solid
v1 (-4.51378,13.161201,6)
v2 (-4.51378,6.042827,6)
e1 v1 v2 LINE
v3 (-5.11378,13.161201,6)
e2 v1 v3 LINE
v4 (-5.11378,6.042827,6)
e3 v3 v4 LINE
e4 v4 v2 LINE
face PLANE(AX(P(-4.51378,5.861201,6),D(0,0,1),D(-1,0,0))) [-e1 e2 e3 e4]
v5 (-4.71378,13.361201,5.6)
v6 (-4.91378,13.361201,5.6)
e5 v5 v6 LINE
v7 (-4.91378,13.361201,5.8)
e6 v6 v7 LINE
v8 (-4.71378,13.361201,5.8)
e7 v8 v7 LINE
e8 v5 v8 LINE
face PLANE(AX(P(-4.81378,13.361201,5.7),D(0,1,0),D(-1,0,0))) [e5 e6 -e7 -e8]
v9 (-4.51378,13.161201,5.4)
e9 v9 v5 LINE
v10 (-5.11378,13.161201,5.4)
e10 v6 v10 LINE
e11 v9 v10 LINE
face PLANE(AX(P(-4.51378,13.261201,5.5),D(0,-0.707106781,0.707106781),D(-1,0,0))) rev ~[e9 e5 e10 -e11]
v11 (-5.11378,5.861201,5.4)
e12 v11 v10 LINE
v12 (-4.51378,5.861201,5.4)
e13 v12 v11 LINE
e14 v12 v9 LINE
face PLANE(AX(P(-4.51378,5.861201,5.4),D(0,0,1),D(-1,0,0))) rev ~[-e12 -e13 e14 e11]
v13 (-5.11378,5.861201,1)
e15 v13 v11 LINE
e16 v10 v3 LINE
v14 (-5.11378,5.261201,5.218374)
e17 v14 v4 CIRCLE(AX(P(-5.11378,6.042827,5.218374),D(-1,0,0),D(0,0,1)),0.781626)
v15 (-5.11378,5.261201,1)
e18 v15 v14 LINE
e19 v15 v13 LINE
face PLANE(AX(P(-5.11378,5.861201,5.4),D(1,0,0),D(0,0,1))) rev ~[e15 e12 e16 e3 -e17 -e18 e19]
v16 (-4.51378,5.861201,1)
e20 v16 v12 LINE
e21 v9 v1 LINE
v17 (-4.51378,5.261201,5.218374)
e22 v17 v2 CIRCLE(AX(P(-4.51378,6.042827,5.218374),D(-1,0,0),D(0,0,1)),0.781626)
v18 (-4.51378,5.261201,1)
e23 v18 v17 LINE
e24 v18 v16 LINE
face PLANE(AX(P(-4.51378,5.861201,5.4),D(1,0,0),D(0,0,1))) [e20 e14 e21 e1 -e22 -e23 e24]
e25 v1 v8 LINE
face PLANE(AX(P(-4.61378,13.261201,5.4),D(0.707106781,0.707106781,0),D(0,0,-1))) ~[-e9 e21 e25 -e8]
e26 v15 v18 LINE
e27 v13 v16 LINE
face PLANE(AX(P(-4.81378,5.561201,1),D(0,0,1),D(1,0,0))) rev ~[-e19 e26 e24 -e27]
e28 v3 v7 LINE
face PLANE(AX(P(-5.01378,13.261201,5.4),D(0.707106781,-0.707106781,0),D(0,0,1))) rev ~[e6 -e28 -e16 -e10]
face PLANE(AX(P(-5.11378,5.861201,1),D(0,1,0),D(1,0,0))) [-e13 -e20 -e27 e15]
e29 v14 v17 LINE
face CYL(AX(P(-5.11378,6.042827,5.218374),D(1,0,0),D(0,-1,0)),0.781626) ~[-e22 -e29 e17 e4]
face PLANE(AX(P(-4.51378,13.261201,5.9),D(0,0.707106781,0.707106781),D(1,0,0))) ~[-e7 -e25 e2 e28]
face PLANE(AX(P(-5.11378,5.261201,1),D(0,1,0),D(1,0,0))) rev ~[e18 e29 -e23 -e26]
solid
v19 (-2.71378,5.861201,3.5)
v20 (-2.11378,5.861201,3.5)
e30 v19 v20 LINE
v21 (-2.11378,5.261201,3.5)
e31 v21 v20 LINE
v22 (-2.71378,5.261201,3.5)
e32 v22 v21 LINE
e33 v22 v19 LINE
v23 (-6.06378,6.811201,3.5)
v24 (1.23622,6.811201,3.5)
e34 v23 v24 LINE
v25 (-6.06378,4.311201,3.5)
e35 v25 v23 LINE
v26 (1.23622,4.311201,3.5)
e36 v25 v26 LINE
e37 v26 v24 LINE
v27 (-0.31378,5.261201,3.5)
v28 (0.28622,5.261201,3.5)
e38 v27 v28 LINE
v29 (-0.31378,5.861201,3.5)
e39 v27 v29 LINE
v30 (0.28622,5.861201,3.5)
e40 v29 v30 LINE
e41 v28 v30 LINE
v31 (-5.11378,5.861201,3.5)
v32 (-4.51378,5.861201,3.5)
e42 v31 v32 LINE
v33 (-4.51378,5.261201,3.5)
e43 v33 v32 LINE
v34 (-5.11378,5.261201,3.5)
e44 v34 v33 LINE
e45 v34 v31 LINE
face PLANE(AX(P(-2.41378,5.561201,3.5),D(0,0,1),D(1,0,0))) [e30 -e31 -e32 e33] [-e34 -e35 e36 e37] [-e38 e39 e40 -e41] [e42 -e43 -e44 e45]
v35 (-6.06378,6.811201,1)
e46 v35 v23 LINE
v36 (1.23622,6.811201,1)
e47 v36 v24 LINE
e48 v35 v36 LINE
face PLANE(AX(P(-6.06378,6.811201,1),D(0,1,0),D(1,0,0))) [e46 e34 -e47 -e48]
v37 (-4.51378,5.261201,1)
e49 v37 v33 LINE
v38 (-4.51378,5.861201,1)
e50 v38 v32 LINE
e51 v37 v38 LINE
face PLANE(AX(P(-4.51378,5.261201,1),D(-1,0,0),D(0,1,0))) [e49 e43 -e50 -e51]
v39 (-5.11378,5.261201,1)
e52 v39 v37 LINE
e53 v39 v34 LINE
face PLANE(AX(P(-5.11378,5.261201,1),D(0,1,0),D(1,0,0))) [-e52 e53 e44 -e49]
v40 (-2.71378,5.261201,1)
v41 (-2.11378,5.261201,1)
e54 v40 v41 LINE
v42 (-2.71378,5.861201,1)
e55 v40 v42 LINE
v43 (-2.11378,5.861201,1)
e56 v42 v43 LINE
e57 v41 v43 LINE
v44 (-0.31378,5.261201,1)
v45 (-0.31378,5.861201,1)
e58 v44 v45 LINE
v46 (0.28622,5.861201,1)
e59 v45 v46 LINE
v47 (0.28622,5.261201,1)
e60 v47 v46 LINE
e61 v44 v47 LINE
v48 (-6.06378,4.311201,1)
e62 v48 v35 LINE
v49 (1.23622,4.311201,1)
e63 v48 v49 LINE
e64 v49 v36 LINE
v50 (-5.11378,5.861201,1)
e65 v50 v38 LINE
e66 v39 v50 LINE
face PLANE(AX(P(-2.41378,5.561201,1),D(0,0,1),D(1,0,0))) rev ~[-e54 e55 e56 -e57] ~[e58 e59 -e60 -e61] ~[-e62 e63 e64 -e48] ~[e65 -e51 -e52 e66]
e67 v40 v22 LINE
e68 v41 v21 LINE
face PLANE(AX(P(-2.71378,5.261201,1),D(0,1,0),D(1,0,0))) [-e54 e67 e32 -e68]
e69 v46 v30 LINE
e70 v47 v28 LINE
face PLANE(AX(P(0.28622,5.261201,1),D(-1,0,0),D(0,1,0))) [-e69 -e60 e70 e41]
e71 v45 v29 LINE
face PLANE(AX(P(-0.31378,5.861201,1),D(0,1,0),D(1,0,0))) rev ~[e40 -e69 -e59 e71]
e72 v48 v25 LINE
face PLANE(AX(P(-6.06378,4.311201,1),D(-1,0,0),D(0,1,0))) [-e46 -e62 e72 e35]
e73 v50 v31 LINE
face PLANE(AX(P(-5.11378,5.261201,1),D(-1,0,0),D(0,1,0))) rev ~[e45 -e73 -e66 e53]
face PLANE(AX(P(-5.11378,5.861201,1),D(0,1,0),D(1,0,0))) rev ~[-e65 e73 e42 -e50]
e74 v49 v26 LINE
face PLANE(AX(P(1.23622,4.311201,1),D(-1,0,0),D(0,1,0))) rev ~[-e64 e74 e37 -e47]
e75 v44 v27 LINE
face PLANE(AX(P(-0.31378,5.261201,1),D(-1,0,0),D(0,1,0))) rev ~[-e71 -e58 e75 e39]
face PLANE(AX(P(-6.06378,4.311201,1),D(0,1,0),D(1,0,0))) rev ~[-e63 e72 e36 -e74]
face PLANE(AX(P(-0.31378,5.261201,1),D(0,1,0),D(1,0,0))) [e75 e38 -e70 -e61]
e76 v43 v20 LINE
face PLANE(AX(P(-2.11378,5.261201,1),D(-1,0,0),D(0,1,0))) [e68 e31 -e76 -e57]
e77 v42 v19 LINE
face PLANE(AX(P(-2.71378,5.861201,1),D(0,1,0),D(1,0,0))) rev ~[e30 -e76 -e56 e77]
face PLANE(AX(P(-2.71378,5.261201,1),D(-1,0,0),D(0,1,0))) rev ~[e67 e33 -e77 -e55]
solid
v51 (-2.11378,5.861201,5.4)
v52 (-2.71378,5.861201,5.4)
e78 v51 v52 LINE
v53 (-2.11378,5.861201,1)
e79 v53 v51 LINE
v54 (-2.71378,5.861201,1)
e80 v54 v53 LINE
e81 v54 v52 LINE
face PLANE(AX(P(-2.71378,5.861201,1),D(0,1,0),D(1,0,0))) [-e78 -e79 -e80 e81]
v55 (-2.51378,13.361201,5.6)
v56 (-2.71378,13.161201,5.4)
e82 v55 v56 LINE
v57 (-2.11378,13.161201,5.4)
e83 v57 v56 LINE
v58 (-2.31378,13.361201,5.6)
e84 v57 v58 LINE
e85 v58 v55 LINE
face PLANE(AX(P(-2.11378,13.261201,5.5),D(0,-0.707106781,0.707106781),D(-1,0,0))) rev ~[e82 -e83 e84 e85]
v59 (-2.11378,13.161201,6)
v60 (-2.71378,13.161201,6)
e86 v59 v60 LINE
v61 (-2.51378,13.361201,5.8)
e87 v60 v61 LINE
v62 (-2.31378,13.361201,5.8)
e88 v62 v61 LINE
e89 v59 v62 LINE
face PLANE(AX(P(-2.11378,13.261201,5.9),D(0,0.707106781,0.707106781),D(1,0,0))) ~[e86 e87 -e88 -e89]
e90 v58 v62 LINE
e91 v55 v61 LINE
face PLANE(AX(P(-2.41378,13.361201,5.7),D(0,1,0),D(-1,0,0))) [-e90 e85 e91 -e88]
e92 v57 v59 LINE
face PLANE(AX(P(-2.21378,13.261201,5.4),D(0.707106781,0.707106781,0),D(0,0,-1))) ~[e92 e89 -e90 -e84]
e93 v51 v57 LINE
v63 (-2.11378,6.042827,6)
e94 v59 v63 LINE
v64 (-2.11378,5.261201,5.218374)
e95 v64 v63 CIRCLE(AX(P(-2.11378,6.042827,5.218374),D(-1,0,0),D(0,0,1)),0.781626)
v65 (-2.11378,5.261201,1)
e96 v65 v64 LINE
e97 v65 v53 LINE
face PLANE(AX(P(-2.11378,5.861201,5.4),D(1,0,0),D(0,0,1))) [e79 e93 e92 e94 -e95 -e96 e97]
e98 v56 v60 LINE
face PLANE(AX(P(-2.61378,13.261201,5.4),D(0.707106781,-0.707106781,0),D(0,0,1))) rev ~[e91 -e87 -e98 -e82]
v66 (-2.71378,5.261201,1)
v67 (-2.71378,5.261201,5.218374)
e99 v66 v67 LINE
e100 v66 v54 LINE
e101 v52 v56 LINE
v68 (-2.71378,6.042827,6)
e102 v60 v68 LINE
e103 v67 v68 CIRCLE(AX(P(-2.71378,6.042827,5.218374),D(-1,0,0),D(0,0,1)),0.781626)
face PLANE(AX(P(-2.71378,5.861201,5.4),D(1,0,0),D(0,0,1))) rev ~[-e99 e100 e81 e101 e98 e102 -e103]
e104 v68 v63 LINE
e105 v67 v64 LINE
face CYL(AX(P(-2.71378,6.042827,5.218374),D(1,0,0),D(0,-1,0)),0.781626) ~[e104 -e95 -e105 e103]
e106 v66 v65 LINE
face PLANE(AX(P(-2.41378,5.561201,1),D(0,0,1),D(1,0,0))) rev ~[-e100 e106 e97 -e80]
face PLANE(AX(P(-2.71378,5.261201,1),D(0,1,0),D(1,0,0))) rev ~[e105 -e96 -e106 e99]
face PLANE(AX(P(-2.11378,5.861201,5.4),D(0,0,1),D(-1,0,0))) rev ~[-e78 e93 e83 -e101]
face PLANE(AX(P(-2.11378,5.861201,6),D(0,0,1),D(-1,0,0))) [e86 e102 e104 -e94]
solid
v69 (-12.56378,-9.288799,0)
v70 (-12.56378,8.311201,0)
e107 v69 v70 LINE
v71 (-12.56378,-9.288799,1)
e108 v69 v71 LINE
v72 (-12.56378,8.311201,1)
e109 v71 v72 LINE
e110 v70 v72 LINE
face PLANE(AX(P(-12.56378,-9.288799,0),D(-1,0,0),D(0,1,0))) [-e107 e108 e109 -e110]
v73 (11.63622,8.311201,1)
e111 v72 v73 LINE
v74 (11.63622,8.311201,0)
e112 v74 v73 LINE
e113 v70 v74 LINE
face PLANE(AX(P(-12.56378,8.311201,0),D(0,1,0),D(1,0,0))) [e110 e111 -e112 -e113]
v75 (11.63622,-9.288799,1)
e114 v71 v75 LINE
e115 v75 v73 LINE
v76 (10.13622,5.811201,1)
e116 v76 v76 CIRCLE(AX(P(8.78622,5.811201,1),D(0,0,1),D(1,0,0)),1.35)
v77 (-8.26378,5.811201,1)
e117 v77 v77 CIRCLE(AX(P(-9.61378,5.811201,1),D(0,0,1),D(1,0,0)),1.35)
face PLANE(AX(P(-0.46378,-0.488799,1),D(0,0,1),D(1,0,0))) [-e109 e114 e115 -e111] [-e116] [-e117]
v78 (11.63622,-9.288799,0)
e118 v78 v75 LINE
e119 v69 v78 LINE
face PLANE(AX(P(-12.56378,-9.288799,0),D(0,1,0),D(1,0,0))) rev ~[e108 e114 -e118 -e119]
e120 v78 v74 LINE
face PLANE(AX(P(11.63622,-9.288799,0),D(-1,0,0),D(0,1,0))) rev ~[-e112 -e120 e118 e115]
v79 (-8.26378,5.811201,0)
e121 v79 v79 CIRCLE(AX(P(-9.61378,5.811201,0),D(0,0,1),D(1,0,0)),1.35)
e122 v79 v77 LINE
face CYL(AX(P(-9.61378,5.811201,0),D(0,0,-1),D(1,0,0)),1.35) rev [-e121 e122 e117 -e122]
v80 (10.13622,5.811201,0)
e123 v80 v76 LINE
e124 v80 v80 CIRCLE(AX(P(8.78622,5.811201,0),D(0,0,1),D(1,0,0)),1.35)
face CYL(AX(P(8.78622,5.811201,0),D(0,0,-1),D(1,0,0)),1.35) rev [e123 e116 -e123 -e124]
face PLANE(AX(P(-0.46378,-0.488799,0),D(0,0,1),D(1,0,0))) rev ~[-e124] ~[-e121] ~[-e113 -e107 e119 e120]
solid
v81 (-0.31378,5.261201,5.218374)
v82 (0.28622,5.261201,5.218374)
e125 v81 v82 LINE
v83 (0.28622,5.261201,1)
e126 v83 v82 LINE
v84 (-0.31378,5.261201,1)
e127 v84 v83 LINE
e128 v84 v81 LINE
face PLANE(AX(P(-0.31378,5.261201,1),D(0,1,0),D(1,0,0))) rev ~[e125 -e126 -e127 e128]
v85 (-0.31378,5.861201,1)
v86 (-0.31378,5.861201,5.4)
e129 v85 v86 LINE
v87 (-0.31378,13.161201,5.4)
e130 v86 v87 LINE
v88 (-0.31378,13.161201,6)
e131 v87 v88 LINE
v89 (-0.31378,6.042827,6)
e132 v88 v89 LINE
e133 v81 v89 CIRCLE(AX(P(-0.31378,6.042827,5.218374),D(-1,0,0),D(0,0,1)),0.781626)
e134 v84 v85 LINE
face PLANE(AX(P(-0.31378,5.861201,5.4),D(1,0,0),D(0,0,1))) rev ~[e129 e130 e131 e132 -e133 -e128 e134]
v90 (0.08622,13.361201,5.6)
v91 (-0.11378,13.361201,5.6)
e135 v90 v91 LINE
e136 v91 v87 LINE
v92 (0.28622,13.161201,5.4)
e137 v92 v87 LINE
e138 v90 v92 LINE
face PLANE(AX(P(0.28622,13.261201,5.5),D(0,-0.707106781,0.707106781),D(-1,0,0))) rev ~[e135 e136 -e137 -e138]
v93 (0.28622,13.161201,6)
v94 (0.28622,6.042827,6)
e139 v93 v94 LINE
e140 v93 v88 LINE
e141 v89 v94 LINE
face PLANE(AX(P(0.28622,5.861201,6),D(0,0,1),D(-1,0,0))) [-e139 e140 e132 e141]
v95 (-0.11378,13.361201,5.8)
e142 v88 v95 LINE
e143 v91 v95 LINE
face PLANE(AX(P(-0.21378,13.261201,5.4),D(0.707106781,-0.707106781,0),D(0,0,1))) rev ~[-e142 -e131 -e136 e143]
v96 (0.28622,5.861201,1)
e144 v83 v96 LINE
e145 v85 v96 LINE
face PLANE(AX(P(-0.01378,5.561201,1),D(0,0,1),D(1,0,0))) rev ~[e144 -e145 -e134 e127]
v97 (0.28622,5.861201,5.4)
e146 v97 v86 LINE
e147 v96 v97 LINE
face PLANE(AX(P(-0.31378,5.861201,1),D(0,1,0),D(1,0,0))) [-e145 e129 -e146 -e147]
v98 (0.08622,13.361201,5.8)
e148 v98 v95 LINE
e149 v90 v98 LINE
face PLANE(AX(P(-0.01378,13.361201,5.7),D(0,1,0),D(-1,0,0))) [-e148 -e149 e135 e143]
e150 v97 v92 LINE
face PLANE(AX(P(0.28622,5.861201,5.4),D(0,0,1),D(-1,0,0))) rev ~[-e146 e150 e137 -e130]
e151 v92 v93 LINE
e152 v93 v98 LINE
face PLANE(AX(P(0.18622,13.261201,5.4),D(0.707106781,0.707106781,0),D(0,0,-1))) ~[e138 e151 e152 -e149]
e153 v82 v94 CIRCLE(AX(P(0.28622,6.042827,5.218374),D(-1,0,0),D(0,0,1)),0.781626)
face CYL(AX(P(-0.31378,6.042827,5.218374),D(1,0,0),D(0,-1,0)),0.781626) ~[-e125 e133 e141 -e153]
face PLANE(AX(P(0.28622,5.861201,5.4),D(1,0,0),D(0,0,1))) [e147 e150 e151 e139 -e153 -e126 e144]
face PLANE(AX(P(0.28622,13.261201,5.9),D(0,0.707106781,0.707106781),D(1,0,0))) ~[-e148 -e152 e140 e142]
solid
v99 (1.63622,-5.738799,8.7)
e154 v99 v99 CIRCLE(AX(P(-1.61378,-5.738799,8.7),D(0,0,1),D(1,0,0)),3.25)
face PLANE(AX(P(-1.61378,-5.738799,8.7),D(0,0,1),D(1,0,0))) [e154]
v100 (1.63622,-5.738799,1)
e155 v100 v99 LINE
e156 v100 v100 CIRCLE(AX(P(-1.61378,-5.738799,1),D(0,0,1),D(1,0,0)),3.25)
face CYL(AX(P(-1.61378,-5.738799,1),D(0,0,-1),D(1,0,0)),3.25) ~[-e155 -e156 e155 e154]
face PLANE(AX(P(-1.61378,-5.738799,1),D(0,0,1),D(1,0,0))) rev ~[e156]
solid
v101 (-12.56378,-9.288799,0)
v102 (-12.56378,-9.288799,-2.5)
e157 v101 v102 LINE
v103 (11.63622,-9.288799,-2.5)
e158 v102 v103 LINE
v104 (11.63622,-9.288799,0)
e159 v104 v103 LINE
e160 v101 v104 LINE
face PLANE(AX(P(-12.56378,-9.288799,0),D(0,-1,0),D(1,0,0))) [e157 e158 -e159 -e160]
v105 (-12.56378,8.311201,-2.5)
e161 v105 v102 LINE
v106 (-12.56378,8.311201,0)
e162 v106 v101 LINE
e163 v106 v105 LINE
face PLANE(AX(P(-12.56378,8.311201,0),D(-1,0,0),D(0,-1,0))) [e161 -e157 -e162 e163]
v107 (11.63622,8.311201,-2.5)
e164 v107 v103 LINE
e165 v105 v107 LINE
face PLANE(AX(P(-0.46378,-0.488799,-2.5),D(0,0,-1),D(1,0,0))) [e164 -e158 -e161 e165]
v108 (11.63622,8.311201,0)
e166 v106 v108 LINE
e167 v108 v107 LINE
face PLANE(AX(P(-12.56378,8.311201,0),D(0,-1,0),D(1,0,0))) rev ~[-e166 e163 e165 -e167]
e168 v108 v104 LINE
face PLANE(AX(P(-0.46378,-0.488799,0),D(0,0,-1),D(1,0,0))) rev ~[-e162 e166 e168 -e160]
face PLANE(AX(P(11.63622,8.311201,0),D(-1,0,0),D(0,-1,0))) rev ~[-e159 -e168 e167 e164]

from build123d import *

# Parameters (mm, degrees)
F0_W      = 24.2
F0_H      = 17.6
F0_R      = 1.35
F1_DEPTH  = 1
F2_W      = 7.3
F2_H      = 2.5
F2_W_2    = 0.6
F2_H_2    = 0.6
F3_DEPTH  = 2.5
F4_W      = 0.6
F4_H      = 0.6
F5_DEPTH  = 5
F6_W      = 0.6
F6_H      = 0.6
F7_DEPTH  = 7.5
F8_R      = 0.781625783
F8_2_R    = 0.781625783
F8_3_R    = 0.781625783
F9_SIZE   = 0.2
F9_2_SIZE = 0.2
F9_3_SIZE = 0.2
F10_R     = 3.25
F11_DEPTH = 7.7
F12_W     = 24.2
F12_H     = 17.6
F12_R     = 1.35
F13_DEPTH = 2.5


with BuildPart() as f1:
    # F0 (on Top) → F1 (new body)
    with BuildSketch(Plane.XY):
        with Locations((-0.4637802485, -0.4887992391)):
            Rectangle(F0_W, F0_H)
        with Locations((-9.6137802485, 5.8112007609)):
            Circle(F0_R, mode=Mode.SUBTRACT)
        with Locations((8.7862197515, 5.8112007609)):
            Circle(F0_R, mode=Mode.SUBTRACT)
    extrude(amount=F1_DEPTH)


with BuildPart() as f3:
    # F2 (on face) → F3 (new body)
    with BuildSketch(Plane.XY.offset(1)):
        with Locations((-2.4137802485, 5.5612007609)):
            Rectangle(F2_W, F2_H)
        with Locations((-4.8137802485, 5.5612007609)):
            Rectangle(F2_W_2, F2_H_2, mode=Mode.SUBTRACT)
        with Locations((-2.4137802485, 5.5612007609)):
            Rectangle(F2_W_2, F2_H_2, mode=Mode.SUBTRACT)
        with Locations((-0.0137802485, 5.5612007609)):
            Rectangle(F2_W_2, F2_H_2, mode=Mode.SUBTRACT)
    extrude(amount=F3_DEPTH)


with BuildPart() as f5:
    # F4 (on face) → F5 (new body)
    with BuildSketch(Plane.XY.offset(1)):
        with Locations((-4.8137802485, 5.5612007609)):
            Rectangle(F4_W, F4_H)
    extrude(amount=F5_DEPTH)

    # F6 (on face) → F7, piece 3 (join)
    with BuildSketch(Plane(origin=(0, 5.8612007609, 0), x_dir=(-1, 0, 0), z_dir=(0, 1, 0))):
        with Locations((4.8137802485, 5.7)):
            Rectangle(F6_W, F6_H)
    extrude(amount=F7_DEPTH)

    # F8
    f8_edges = [f5.edges().sort_by_distance(p)[0] for p in [
        (-4.81378, 5.261201, 6),
    ]]
    fillet(f8_edges, radius=F8_R)

    # F9
    f9_edges = [f5.edges().sort_by_distance(p)[0] for p in [
        (-4.81378, 13.361201, 6),
        (-4.51378, 13.361201, 5.7),
        (-4.81378, 13.361201, 5.4),
        (-5.11378, 13.361201, 5.7),
    ]]
    chamfer(f9_edges, length=F9_SIZE)


with BuildPart() as f5b:
    # F4 (on face) → F5, piece 2 (new body)
    with BuildSketch(Plane.XY.offset(1)):
        with Locations((-2.4137802485, 5.5612007609)):
            Rectangle(F4_W, F4_H)
    extrude(amount=F5_DEPTH)

    # F6 (on face) → F7, piece 2 (join)
    with BuildSketch(Plane(origin=(0, 5.8612007609, 0), x_dir=(-1, 0, 0), z_dir=(0, 1, 0))):
        with Locations((2.4137802485, 5.7)):
            Rectangle(F6_W, F6_H)
    extrude(amount=F7_DEPTH)

    # F8#2
    f8_2_edges = [f5b.edges().sort_by_distance(p)[0] for p in [
        (-2.41378, 5.261201, 6),
    ]]
    fillet(f8_2_edges, radius=F8_2_R)

    # F9#2
    f9_2_edges = [f5b.edges().sort_by_distance(p)[0] for p in [
        (-2.11378, 13.361201, 5.7),
        (-2.41378, 13.361201, 6),
        (-2.41378, 13.361201, 5.4),
        (-2.71378, 13.361201, 5.7),
    ]]
    chamfer(f9_2_edges, length=F9_2_SIZE)


with BuildPart() as f5c:
    # F4 (on face) → F5, piece 3 (new body)
    with BuildSketch(Plane.XY.offset(1)):
        with Locations((-0.0137802485, 5.5612007609)):
            Rectangle(F4_W, F4_H)
    extrude(amount=F5_DEPTH)

    # F6 (on face) → F7 (join)
    with BuildSketch(Plane(origin=(0, 5.8612007609, 0), x_dir=(-1, 0, 0), z_dir=(0, 1, 0))):
        with Locations((0.0137802485, 5.7)):
            Rectangle(F6_W, F6_H)
    extrude(amount=F7_DEPTH)

    # F8#3
    f8_3_edges = [f5c.edges().sort_by_distance(p)[0] for p in [
        (-0.01378, 5.261201, 6),
    ]]
    fillet(f8_3_edges, radius=F8_3_R)

    # F9#3
    f9_3_edges = [f5c.edges().sort_by_distance(p)[0] for p in [
        (-0.01378, 13.361201, 6),
        (-0.01378, 13.361201, 5.4),
        (0.28622, 13.361201, 5.7),
        (-0.31378, 13.361201, 5.7),
    ]]
    chamfer(f9_3_edges, length=F9_3_SIZE)


with BuildPart() as f11:
    # F10 (on face) → F11 (new body)
    with BuildSketch(Plane.XY.offset(1)):
        with Locations((-1.6137802485, -5.7387992391)):
            Circle(F10_R)
    extrude(amount=F11_DEPTH)


with BuildPart() as f13:
    # F12 (on face) → F13 (new body)
    with BuildSketch(Plane(origin=(0, 0, 0), x_dir=(1, 0, 0), z_dir=(0, 0, -1))):
        with Locations((-0.4637802485, 0.4887992391)):
            Rectangle(F12_W, F12_H)
        with Locations((-9.6137802485, -5.8112007609)):
            Circle(F12_R, mode=Mode.SUBTRACT)
        with Locations((8.7862197515, -5.8112007609)):
            Circle(F12_R, mode=Mode.SUBTRACT)
        with Locations((-9.6137802485, -5.8112007609)):
            Circle(F12_R)
        with Locations((8.7862197515, -5.8112007609)):
            Circle(F12_R)
    extrude(amount=F13_DEPTH)


solid = Compound([f1.part, f3.part, f5.part, f5b.part, f5c.part, f11.part, f13.part])
